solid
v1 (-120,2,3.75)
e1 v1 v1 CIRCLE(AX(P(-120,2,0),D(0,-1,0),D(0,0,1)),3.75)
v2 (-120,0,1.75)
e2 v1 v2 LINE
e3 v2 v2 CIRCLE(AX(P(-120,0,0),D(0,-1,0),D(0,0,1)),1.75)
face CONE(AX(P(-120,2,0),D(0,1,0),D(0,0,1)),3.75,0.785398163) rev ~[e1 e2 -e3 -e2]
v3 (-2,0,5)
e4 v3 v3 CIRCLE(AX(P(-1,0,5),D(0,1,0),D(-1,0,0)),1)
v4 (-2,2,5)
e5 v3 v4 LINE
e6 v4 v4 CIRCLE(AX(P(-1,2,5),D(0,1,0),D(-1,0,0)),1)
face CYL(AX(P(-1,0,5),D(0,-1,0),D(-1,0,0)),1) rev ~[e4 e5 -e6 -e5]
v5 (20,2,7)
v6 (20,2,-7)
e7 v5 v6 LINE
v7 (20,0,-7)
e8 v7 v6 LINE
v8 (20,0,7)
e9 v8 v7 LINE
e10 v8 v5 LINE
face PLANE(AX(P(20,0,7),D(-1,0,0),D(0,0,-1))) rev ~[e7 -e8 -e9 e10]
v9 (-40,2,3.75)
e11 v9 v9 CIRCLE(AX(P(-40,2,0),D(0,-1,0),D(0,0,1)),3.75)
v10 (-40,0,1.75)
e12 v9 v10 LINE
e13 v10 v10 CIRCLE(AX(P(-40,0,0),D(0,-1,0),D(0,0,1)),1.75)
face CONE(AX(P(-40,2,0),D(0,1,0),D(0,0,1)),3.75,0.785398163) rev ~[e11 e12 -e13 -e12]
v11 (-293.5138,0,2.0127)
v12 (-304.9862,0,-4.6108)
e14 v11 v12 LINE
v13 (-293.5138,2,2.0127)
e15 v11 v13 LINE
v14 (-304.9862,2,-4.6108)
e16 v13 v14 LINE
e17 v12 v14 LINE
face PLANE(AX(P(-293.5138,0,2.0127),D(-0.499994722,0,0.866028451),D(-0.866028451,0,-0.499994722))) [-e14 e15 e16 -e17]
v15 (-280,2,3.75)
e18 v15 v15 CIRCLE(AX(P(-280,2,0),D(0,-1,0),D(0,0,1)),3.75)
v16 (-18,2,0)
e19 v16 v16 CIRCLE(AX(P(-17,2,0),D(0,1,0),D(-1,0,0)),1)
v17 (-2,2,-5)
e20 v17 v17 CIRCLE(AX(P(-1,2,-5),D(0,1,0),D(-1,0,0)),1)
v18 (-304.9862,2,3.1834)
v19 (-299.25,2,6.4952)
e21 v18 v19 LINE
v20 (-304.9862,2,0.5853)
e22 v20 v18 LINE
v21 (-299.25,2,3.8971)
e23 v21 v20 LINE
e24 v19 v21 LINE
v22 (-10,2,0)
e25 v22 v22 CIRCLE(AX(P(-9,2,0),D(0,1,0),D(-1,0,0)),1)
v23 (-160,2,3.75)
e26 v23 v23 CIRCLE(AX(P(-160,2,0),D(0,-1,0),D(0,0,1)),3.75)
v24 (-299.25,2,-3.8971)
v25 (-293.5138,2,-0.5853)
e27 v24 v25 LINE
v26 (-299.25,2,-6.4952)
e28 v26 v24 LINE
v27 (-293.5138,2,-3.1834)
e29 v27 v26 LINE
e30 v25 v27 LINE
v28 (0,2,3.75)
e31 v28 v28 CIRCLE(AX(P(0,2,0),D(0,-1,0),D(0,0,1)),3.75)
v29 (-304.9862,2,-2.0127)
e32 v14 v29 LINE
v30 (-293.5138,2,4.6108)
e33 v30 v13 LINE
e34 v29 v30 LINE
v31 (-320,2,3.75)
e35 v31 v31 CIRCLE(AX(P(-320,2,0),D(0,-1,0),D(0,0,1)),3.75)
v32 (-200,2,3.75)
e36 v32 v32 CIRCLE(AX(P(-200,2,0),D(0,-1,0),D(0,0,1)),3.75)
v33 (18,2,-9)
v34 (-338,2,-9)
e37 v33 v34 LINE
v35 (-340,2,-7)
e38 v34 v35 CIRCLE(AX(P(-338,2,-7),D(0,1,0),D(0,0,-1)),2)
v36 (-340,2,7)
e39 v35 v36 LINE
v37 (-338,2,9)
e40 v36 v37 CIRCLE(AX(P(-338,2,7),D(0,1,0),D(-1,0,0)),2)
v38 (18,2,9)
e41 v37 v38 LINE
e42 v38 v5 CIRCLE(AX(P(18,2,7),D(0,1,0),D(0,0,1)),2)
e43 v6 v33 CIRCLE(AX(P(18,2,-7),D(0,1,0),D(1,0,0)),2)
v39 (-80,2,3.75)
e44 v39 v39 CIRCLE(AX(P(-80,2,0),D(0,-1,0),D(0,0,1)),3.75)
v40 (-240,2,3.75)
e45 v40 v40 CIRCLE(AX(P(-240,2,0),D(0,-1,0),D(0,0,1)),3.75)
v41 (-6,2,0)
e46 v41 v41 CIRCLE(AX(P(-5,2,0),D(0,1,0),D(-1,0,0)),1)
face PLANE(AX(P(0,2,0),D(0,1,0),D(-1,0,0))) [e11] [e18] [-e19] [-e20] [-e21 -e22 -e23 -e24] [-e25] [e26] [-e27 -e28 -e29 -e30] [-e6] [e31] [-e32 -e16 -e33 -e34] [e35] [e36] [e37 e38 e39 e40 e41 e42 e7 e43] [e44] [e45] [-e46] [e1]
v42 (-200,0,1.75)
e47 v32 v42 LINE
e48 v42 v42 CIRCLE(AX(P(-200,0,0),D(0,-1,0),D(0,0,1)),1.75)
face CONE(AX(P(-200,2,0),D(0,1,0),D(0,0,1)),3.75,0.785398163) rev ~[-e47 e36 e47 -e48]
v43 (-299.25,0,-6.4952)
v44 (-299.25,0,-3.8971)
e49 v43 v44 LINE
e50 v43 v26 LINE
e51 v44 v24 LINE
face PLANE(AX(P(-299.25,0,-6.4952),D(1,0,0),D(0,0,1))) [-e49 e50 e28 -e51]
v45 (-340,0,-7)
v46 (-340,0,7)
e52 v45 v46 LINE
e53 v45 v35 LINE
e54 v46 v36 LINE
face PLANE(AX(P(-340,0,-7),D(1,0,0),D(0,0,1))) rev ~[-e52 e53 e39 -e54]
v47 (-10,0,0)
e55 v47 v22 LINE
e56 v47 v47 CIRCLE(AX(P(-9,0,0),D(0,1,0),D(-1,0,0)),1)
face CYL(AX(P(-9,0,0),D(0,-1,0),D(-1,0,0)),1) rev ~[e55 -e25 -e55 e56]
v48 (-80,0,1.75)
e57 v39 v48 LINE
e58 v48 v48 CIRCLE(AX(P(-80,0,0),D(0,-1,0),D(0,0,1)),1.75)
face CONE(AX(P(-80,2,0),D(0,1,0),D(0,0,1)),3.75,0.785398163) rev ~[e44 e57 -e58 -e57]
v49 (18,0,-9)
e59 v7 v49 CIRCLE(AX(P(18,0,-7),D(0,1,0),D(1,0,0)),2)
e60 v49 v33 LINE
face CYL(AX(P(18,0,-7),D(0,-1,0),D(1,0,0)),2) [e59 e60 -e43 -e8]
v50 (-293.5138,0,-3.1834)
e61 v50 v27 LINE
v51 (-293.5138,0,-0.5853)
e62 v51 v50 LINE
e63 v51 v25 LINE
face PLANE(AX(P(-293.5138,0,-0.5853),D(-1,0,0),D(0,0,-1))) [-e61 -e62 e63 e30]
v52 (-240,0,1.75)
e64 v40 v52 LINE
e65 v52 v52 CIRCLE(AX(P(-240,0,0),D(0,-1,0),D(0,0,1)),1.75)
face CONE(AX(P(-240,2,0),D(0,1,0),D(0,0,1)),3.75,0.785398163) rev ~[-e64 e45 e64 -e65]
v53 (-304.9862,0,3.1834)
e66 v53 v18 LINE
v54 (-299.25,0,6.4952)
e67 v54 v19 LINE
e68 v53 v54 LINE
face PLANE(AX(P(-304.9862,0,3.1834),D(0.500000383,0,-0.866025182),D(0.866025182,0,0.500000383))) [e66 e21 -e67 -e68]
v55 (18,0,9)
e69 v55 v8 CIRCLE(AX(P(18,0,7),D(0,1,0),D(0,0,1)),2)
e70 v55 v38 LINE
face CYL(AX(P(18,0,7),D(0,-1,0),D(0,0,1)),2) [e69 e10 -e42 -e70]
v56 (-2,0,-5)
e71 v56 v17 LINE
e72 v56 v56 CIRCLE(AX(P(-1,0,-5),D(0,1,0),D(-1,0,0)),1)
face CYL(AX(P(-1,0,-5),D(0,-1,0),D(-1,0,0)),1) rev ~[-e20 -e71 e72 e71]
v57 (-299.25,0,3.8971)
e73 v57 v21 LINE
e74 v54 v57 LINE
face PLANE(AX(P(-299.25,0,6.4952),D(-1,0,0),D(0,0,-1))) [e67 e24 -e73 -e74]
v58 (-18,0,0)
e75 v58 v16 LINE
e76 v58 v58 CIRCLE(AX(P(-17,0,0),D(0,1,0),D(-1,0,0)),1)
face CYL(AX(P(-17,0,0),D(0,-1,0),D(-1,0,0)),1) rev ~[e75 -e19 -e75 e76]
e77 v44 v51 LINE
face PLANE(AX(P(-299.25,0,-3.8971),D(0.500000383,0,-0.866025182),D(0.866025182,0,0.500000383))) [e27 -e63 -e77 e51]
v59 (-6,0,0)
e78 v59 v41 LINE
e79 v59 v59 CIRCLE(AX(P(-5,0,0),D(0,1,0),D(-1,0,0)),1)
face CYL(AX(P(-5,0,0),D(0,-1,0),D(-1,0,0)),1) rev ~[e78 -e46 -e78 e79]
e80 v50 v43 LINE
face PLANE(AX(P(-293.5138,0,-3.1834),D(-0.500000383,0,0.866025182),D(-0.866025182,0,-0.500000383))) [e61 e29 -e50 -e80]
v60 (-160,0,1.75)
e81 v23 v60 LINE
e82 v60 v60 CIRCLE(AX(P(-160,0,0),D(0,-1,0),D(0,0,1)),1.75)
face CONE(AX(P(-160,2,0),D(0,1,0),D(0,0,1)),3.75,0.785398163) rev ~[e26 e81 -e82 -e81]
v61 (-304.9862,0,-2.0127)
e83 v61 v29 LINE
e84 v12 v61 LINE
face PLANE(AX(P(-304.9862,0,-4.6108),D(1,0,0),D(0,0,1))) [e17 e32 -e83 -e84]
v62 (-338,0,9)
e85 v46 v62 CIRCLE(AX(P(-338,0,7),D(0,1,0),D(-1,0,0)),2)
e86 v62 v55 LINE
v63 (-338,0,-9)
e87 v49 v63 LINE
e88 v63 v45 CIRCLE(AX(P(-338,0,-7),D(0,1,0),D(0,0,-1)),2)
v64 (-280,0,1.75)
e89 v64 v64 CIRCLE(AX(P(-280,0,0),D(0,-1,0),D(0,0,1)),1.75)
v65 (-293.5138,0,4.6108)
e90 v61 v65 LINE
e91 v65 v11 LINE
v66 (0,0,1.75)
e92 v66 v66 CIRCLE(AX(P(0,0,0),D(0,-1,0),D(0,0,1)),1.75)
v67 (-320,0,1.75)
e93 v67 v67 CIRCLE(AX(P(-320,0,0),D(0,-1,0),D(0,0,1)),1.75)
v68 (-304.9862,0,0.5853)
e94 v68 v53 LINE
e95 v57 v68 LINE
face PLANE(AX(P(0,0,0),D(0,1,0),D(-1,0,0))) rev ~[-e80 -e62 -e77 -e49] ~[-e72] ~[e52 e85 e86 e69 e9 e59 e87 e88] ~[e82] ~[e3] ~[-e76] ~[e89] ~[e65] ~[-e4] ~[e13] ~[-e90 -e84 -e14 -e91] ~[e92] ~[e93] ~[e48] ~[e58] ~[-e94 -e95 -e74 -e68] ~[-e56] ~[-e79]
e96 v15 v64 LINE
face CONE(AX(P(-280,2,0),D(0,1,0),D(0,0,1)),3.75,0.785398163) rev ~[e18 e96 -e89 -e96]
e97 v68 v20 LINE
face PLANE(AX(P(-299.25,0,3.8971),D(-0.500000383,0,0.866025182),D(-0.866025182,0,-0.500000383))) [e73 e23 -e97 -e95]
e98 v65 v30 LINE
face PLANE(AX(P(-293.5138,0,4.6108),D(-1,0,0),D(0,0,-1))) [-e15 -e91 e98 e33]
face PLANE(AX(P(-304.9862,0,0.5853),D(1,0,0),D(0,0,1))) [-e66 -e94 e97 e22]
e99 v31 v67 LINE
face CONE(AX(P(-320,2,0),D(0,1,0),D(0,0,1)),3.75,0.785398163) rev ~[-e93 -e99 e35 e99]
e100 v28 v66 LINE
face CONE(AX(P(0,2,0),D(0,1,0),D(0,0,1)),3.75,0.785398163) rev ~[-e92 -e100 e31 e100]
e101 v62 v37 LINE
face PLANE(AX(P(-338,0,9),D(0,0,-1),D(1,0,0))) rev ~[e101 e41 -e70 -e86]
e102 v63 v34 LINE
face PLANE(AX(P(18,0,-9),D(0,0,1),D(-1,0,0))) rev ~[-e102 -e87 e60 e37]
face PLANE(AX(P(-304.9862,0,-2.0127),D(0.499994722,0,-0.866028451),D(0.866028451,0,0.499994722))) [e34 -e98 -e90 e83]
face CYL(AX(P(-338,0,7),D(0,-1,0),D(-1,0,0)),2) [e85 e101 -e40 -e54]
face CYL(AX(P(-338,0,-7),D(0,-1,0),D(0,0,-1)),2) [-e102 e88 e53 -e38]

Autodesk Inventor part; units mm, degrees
ref_plane "YZ Plane" through (0, 0, 0) normal (1, 0, 0) x (0, 1, 0)
ref_plane "XZ Plane" through (0, 0, 0) normal (0, 1, 0) x (-1, 0, 0)
ref_plane "XY Plane" through (0, 0, 0) normal (0, 0, 1) x (1, 0, 0)
sketch "ExtrusionBacker_X_350mm" plane through (0, 0, 0) normal (0, 0, 1) x (1, 0, 0)
  arc A0 (340.9999, 24.106) -> (342.9999, 26.106) centre (340.9999, 26.106) ccw
  line L0 (342.9999, 26.106) -> (342.9999, 40.106)
  arc A1 (342.9999, 40.106) -> (340.9999, 42.106) centre (340.9999, 40.106) ccw
  line L1 (340.9999, 42.106) -> (-15.0001, 42.106)
  arc A2 (-15.0001, 42.106) -> (-17.0001, 40.106) centre (-15.0001, 40.106) ccw
  line L2 (-17.0001, 40.106) -> (-17.0001, 26.106)
  arc A3 (-17.0001, 26.106) -> (-15.0001, 24.106) centre (-15.0001, 26.106) ccw
  line L3 (-15.0001, 24.106) -> (340.9999, 24.106)
  line L4 (302.2499, 37.0031) -> (307.986, 33.6914)
  line L5 (307.986, 33.6914) -> (307.986, 36.2894)
  line L6 (307.986, 36.2894) -> (302.2499, 39.6012)
  line L7 (302.2499, 39.6012) -> (302.2499, 37.0031)
  line L8 (296.5137, 37.7168) -> (296.5137, 35.1187)
  line L9 (296.5137, 35.1187) -> (307.986, 28.4952)
  line L10 (307.986, 28.4952) -> (307.986, 31.0933)
  line L11 (307.986, 31.0933) -> (296.5137, 37.7168)
  line L12 (296.5137, 32.5207) -> (296.5137, 29.9226)
  line L13 (296.5137, 29.9226) -> (302.2499, 26.6108)
  line L14 (302.2499, 26.6108) -> (302.2499, 29.2089)
  line L15 (302.2499, 29.2089) -> (296.5137, 32.5207)
  circle A4 centre (122.9999, 33.106) radius 1.7
  circle A5 centre (202.9999, 33.106) radius 1.7
  circle A6 centre (242.9999, 33.106) radius 1.7
  circle A7 centre (162.9999, 33.106) radius 1.7
  circle A8 centre (3.9999, 38.106) radius 1
  circle A9 centre (3.9999, 28.106) radius 1
  circle A10 centre (11.9999, 33.106) radius 1
  circle A11 centre (42.9999, 33.106) radius 1.7
  circle A12 centre (82.9999, 33.106) radius 1.7
  circle A13 centre (282.9999, 33.106) radius 1.7
  circle A14 centre (19.9999, 33.106) radius 1
  circle A15 centre (2.9999, 33.106) radius 1.7
  circle A16 centre (322.9999, 33.106) radius 1.7
  circle A17 centre (7.9999, 33.106) radius 1
sketch "Skizze1" plane through (0, 0, 0) normal (0, 1, 0) x (-1, 0, 0)
  arc A0 (338, -9) -> (340, -7) centre (338, -7) ccw
  line L0 (340, -7) -> (340, 7)
  arc A1 (340, 7) -> (338, 9) centre (338, 7) ccw
  line L1 (338, 9) -> (-18, 9)
  arc A2 (-18, 9) -> (-20, 7) centre (-18, 7) ccw
  line L2 (-20, 7) -> (-20, -7)
  arc A3 (-20, -7) -> (-18, -9) centre (-18, -7) ccw
  line L3 (-18, -9) -> (338, -9)
  line L4 (299.25, 3.8971) -> (304.9862, 0.5853)
  line L5 (304.9862, 0.5853) -> (304.9862, 3.1834)
  line L6 (304.9862, 3.1834) -> (299.25, 6.4952)
  line L7 (299.25, 6.4952) -> (299.25, 3.8971)
  line L8 (293.5138, 4.6108) -> (293.5138, 2.0127)
  line L9 (293.5138, 2.0127) -> (304.9862, -4.6108)
  line L10 (304.9862, -4.6108) -> (304.9862, -2.0127)
  line L11 (304.9862, -2.0127) -> (293.5138, 4.6108)
  line L12 (293.5138, -0.5853) -> (293.5138, -3.1834)
  line L13 (293.5138, -3.1834) -> (299.25, -6.4952)
  line L14 (299.25, -6.4952) -> (299.25, -3.8971)
  line L15 (299.25, -3.8971) -> (293.5138, -0.5853)
  circle A4 centre (120, 0) radius 1.7
  circle A5 centre (200, 0) radius 1.7
  circle A6 centre (240, 0) radius 1.7
  circle A7 centre (160, 0) radius 1.7
  circle A8 centre (1, 5) radius 1
  circle A9 centre (1, -5) radius 1
  circle A10 centre (9, 0) radius 1
  circle A11 centre (40, 0) radius 1.7
  circle A12 centre (80, 0) radius 1.7
  circle A13 centre (280, 0) radius 1.7
  circle A14 centre (17, 0) radius 1
  circle A15 centre (0, 0) radius 1.7
  circle A16 centre (320, 0) radius 1.7
  circle A17 centre (5, 0) radius 1
  point P0 (338, -9)
  point P1 (340, 7)
  point P2 (338, 9)
  point P3 (-18, 9)
  point P4 (-20, 7)
  point P5 (-20, -7)
  point P6 (-18, -9)
  point P7 (293.5138, -0.5853)
  point P8 (299.25, -3.8971)
  point P9 (299.25, -6.4952)
  point P10 (293.5138, -3.1834)
  point P11 (293.5138, 4.6108)
  point P12 (304.9862, -2.0127)
  point P13 (304.9862, -4.6108)
  point P14 (293.5138, 2.0127)
  point P15 (299.25, 3.8971)
  point P16 (299.25, 6.4952)
  point P17 (304.9862, 3.1834)
  point P18 (304.9862, 0.5853)
extrude "Extrusion1" add sketch "Skizze1" along normal blind 2
sketch "Skizze2" plane through (0, 2, 0) normal (0, 1, 0) x (1, 0, 0)
  circle A0 centre (-320, 0) radius 1.7 projected
  circle A1 centre (-280, 0) radius 1.7 projected
  circle A2 centre (-240, 0) radius 1.7 projected
  circle A3 centre (-200, 0) radius 1.7 projected
  circle A4 centre (-160, 0) radius 1.7 projected
  circle A5 centre (-120, 0) radius 1.7 projected
  circle A6 centre (-80, 0) radius 1.7 projected
  circle A7 centre (-40, 0) radius 1.7 projected
  circle A8 centre (0, 0) radius 1.7 projected
  point P0 (-81.3289, 1.9857)
hole "Bohrung1" at (-320, 2, 0) at (-280, 2, 0) at (-240, 2, 0) at (-200, 2, 0) at (-160, 2, 0) at (-120, 2, 0) at (-80, 2, 0) at (-40, 2, 0) at (0, 2, 0) direction (0, -1, 0) diameter 3.4 end through all countersink diameter 7.5 countersink angle 90 clearance for "Innensechskant-Senkkopfschraube DIN EN ISO 10642" size "M3" standard "DIN"
properties part number "X Extrusion-Backer (350mm)" material "Titan"
